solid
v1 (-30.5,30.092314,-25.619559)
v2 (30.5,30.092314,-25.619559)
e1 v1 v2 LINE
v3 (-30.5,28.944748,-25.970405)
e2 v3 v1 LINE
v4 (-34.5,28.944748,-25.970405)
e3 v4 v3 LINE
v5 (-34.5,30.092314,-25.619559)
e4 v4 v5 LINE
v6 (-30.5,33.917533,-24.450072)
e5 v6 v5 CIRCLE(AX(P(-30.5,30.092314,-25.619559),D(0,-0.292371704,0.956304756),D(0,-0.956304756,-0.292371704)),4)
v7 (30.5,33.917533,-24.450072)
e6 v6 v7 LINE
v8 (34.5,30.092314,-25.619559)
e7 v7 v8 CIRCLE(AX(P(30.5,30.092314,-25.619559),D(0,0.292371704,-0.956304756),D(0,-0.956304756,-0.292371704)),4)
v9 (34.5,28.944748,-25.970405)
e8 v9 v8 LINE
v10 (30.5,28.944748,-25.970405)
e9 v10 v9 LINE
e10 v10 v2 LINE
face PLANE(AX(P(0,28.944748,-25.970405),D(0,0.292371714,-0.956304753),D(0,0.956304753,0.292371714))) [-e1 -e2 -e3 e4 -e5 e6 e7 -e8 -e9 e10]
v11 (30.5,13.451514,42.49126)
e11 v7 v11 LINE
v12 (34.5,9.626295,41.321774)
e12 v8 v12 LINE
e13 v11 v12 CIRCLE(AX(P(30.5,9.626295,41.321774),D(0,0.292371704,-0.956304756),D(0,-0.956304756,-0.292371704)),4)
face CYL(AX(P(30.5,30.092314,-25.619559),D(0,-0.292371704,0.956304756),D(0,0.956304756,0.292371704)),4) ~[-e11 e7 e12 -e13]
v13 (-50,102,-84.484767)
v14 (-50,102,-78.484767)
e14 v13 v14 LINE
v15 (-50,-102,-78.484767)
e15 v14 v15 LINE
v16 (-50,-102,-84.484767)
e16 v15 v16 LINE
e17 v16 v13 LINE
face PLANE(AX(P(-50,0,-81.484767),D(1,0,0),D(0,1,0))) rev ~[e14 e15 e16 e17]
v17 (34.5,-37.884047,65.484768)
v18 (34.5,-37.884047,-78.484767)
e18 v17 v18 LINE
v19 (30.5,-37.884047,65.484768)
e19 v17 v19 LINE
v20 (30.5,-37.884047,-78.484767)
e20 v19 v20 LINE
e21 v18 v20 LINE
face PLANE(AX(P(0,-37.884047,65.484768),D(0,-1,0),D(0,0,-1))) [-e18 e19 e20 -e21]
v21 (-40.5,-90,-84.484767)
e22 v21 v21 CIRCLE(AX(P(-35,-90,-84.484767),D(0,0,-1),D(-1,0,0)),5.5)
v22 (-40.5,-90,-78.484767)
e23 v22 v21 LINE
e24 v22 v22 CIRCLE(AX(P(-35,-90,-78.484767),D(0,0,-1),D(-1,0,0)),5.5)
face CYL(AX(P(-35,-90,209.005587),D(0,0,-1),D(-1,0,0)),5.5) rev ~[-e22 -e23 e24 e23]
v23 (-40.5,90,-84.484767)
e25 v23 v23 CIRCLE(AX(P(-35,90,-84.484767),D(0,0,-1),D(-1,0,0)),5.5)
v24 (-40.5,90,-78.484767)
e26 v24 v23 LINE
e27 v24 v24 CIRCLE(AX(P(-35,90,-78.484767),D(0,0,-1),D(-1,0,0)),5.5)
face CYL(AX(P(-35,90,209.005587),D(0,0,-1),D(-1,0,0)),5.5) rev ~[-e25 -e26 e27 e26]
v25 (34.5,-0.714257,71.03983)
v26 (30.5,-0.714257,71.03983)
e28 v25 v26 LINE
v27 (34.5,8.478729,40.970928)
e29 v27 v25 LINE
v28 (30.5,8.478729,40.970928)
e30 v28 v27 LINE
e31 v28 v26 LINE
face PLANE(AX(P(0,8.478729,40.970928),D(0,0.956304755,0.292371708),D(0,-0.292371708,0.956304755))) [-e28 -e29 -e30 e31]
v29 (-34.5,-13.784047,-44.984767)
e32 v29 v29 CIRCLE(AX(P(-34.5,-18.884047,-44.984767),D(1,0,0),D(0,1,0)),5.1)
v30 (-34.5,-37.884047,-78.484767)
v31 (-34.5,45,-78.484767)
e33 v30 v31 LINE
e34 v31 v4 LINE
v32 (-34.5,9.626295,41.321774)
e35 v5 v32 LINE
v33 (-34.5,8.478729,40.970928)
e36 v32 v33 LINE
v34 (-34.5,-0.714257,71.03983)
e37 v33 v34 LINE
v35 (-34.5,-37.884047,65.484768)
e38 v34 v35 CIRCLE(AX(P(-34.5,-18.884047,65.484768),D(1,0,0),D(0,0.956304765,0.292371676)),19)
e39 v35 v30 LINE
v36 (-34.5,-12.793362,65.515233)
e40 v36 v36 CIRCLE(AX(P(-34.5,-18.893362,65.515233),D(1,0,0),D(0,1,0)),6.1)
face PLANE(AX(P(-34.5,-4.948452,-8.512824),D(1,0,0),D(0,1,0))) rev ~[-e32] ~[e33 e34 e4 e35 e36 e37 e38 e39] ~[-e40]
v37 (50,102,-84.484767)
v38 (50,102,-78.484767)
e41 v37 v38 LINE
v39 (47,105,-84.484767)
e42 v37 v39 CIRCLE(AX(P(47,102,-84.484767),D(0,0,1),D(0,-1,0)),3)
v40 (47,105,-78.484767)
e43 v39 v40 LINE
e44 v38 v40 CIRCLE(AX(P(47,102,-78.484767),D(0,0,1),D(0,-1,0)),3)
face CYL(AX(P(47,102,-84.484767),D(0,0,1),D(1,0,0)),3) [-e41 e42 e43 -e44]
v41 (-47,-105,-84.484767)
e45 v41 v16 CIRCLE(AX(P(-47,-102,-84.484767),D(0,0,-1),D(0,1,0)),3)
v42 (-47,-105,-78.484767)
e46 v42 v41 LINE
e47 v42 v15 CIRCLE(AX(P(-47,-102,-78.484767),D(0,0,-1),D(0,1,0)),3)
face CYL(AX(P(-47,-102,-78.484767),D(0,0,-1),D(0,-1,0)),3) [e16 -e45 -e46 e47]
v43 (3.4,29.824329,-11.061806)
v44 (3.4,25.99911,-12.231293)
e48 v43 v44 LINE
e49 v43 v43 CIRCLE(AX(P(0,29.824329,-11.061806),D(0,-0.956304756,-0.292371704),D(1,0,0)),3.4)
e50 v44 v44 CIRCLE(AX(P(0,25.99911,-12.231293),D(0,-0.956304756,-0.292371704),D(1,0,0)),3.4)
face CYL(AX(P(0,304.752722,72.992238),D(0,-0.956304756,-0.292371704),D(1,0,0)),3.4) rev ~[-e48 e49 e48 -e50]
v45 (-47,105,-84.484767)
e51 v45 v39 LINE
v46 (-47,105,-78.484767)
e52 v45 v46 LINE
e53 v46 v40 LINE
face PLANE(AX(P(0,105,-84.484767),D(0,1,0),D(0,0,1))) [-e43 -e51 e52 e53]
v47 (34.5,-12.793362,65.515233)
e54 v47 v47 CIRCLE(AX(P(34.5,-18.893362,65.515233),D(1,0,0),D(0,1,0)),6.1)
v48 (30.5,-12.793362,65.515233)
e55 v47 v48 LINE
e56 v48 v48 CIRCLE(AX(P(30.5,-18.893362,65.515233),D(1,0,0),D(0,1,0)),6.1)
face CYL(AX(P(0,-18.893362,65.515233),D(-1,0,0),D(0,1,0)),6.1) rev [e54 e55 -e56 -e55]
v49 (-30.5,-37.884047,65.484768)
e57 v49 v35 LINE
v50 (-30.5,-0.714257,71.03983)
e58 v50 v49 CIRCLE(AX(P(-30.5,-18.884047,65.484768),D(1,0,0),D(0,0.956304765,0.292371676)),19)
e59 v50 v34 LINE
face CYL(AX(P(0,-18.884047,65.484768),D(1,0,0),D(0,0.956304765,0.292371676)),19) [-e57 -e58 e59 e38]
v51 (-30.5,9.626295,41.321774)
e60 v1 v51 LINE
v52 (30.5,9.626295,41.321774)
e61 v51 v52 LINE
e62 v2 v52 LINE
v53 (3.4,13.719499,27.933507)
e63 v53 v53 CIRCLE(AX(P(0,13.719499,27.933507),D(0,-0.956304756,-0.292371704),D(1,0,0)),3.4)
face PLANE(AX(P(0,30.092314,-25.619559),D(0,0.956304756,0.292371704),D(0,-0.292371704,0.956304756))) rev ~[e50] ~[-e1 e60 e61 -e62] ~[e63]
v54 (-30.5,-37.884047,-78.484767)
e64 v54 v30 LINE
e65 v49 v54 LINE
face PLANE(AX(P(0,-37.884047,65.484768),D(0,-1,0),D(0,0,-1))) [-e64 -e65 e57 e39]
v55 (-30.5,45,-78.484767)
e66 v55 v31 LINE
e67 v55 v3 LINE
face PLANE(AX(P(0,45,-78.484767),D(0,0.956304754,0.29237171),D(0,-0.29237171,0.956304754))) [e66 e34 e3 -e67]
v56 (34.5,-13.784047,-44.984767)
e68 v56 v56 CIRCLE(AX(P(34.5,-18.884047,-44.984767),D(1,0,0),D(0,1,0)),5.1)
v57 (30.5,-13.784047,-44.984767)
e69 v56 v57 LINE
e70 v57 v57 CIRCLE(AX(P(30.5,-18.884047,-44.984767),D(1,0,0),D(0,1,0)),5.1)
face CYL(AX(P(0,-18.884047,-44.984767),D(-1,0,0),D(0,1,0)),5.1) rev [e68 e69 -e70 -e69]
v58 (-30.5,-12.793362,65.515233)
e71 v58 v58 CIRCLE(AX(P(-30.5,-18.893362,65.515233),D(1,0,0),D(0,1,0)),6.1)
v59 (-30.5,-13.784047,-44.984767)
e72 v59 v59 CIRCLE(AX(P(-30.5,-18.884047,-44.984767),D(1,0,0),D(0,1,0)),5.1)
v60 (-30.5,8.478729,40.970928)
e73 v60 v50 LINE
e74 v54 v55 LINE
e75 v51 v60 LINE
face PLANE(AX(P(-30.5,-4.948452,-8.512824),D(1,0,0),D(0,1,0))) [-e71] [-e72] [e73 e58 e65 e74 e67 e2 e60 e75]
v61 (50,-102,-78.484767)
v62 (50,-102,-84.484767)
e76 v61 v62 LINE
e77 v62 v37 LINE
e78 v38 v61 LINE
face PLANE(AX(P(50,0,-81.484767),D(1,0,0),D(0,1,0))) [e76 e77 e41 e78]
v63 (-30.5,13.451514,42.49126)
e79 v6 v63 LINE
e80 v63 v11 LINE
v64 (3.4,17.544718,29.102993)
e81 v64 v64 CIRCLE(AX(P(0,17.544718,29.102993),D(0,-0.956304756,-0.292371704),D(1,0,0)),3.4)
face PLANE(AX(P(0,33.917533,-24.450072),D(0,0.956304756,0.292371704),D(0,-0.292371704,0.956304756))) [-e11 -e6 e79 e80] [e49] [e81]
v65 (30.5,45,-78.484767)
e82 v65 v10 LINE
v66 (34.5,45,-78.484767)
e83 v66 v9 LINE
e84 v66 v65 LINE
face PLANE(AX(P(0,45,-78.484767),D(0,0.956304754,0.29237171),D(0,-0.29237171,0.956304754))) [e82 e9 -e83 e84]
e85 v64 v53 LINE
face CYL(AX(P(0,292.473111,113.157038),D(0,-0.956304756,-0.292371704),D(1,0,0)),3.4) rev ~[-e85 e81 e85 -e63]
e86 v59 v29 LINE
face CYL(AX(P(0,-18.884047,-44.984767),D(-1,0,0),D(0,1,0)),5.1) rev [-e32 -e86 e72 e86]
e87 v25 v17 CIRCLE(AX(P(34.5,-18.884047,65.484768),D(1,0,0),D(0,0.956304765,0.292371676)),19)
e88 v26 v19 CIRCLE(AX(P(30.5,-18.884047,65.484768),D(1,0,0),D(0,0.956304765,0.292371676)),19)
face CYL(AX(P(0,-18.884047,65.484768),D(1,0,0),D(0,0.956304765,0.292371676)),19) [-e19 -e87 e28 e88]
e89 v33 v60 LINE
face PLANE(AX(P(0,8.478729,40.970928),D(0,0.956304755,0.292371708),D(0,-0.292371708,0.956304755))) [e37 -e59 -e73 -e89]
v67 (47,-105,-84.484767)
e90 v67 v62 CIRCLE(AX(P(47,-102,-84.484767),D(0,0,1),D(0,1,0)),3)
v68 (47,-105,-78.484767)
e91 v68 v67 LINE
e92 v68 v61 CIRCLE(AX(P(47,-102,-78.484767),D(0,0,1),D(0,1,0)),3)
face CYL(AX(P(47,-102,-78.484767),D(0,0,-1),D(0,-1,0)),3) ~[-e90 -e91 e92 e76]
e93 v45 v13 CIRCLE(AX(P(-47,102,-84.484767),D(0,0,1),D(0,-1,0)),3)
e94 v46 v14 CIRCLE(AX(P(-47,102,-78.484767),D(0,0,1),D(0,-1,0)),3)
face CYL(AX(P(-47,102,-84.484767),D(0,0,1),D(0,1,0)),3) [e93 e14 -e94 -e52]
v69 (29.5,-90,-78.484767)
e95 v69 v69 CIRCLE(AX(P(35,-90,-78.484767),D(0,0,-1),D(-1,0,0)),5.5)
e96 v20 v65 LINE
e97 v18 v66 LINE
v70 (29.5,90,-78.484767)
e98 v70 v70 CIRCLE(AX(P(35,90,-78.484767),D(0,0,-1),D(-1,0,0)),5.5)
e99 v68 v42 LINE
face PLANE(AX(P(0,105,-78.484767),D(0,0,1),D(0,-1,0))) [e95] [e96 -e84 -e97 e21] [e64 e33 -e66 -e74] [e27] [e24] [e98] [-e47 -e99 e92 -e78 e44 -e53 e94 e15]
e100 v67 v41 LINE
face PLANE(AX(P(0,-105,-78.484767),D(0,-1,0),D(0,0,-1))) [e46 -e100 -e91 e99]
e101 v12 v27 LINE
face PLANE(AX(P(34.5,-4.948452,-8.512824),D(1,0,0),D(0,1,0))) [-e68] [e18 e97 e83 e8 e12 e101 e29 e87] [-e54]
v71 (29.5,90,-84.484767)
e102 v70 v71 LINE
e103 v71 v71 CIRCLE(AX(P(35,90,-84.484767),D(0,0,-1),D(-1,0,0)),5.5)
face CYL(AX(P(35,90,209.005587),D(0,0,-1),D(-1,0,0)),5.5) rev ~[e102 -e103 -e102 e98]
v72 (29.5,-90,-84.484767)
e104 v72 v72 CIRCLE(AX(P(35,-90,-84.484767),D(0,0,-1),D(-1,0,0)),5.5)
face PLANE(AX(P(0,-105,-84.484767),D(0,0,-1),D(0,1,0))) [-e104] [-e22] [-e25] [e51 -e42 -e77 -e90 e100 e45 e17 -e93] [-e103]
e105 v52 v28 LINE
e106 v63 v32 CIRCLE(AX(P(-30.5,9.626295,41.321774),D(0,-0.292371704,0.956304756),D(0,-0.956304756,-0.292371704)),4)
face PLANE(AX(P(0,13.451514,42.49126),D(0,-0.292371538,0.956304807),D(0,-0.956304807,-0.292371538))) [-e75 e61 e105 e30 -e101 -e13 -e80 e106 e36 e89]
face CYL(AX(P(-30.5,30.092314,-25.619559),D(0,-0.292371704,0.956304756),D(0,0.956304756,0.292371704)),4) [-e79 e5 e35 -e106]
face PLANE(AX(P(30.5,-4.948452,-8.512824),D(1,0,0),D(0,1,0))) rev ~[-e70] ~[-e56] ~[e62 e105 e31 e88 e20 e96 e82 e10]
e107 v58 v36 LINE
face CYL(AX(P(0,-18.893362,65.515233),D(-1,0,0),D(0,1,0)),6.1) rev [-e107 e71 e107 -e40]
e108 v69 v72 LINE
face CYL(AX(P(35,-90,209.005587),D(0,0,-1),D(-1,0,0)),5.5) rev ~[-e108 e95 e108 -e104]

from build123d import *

# Parameters (mm, degrees)
F0_R          = 5.1
F0_R_2        = 6.1
F1_DEPTH      = 34.5
F2_R          = 4
F3_T          = 4
F4_DEPTH      = 50
F4_DEPTH_BACK = 50
F5_R          = 3
F7_D          = 11
F9_D          = 6.8


# Not quite as in the source:
# - ends of sketch curves that miss each other by under 0.0002 mm in the source are joined
# - a shell that OpenCascade refuses in one call is made with other operations: the cavity is built on its own and cut out
# - a feature names something its author has since deleted; it is built from what else it names


with BuildPart() as f1:
    # F0 (on Right) → F1 (new body, symmetric)
    with BuildSketch(Plane.YZ):
        with BuildLine():
            Line((1.885386, -78.484767), (45, -78.484767))
            Line((45, -78.484767), (28.944748, -25.970405))
            Line((28.944748, -25.970405), (33.917533, -24.450072))
            Line((33.917533, -24.450072), (13.451514, 42.49126))
            Line((13.451514, 42.49126), (8.478729, 40.970928))
            Line((8.478729, 40.970928), (-0.714257, 71.03983))
            ThreePointArc((-0.714257, 71.03983), (-21.6924256797, 84.2760694236), (-37.884047, 65.484768))
            Line((-37.884047, 65.484768), (-37.884047, -78.484767))
            Line((-37.884047, -78.484767), (-3.771468, -78.484767))
            Line((-3.771468, -78.484767), (1.885386, -78.484767))
        make_face()
        with Locations((-18.884047, -44.984767)):
            Circle(F0_R, mode=Mode.SUBTRACT)
        with Locations((-18.893362, 65.515233)):
            Circle(F0_R_2, mode=Mode.SUBTRACT)
    extrude(amount=F1_DEPTH, both=True)

    # F2
    f2_edges = [f1.edges().sort_by_distance(p)[0] for p in [
        (-34.5, 23.684523, 9.020594),
        (34.5, 23.684523, 9.020594),
    ]]
    fillet(f2_edges, radius=F2_R)

    # F3: shell of thickness 4, made by hand


with BuildPart() as f3_core1:
    # F3_t2: copy of F1
    add(f1.part)

    # the walls: a layer under each face that stays
    f3_faces = [f3_core1.faces().sort_by_distance(p)[0] for p in [
        (-34.5, 3.5579765, 3.0000004813),
        (0, 23.6845235, 9.020594),
        (34.5, 3.5579765, 3.0000004813),
    ]]
    thicken(f3_faces, amount=-F3_T, mode=Mode.SUBTRACT)


with BuildPart() as f1_1:
    add(f1.part)

    # what is left inside the walls is the cavity
    f3_cavity = [f3_core1.part.solids().sort_by_distance(p)[0] for p in [
        (-30.46, 3.557976, -24.161589),
    ]]
    add(f3_cavity, mode=Mode.SUBTRACT)

    # F0 (on Right) → F4 (join, two sides)
    with BuildSketch(Plane.YZ) as f4_sk:
        Polygon((-105, -84.484767), (105, -84.484767), (105, -78.484767), (45, -78.484767), (1.885386, -78.484767), (-3.771468, -78.484767), (-37.884047, -78.484767), (-105, -78.484767), align=None)
    extrude(amount=F4_DEPTH)
    extrude(f4_sk.sketch, amount=-F4_DEPTH_BACK)

    # F5
    f5_edges = [f1_1.edges().sort_by_distance(p)[0] for p in [
        (-50, -105, -81.484767),
        (50, -105, -81.484767),
        (50, 105, -81.484767),
        (-50, 105, -81.484767),
    ]]
    fillet(f5_edges, radius=F5_R)

    # F7 (through all)
    with Locations(Plane.XY.offset(-78.484767)):
        with Locations((-35, 90), (-35, -90), (35, -90), (35, 90)):
            Hole(F7_D / 2)

    # F9 (through all)
    with Locations(Plane(origin=(0, 24.1820677637, 7.3932000384), x_dir=(-1, 0, 0), z_dir=(0, 0.9563047562, 0.2923717041))):
        with Locations((0, 22.7017519629), (0, -19.2982480371)):
            Hole(F9_D / 2)


solid = f1_1.part
